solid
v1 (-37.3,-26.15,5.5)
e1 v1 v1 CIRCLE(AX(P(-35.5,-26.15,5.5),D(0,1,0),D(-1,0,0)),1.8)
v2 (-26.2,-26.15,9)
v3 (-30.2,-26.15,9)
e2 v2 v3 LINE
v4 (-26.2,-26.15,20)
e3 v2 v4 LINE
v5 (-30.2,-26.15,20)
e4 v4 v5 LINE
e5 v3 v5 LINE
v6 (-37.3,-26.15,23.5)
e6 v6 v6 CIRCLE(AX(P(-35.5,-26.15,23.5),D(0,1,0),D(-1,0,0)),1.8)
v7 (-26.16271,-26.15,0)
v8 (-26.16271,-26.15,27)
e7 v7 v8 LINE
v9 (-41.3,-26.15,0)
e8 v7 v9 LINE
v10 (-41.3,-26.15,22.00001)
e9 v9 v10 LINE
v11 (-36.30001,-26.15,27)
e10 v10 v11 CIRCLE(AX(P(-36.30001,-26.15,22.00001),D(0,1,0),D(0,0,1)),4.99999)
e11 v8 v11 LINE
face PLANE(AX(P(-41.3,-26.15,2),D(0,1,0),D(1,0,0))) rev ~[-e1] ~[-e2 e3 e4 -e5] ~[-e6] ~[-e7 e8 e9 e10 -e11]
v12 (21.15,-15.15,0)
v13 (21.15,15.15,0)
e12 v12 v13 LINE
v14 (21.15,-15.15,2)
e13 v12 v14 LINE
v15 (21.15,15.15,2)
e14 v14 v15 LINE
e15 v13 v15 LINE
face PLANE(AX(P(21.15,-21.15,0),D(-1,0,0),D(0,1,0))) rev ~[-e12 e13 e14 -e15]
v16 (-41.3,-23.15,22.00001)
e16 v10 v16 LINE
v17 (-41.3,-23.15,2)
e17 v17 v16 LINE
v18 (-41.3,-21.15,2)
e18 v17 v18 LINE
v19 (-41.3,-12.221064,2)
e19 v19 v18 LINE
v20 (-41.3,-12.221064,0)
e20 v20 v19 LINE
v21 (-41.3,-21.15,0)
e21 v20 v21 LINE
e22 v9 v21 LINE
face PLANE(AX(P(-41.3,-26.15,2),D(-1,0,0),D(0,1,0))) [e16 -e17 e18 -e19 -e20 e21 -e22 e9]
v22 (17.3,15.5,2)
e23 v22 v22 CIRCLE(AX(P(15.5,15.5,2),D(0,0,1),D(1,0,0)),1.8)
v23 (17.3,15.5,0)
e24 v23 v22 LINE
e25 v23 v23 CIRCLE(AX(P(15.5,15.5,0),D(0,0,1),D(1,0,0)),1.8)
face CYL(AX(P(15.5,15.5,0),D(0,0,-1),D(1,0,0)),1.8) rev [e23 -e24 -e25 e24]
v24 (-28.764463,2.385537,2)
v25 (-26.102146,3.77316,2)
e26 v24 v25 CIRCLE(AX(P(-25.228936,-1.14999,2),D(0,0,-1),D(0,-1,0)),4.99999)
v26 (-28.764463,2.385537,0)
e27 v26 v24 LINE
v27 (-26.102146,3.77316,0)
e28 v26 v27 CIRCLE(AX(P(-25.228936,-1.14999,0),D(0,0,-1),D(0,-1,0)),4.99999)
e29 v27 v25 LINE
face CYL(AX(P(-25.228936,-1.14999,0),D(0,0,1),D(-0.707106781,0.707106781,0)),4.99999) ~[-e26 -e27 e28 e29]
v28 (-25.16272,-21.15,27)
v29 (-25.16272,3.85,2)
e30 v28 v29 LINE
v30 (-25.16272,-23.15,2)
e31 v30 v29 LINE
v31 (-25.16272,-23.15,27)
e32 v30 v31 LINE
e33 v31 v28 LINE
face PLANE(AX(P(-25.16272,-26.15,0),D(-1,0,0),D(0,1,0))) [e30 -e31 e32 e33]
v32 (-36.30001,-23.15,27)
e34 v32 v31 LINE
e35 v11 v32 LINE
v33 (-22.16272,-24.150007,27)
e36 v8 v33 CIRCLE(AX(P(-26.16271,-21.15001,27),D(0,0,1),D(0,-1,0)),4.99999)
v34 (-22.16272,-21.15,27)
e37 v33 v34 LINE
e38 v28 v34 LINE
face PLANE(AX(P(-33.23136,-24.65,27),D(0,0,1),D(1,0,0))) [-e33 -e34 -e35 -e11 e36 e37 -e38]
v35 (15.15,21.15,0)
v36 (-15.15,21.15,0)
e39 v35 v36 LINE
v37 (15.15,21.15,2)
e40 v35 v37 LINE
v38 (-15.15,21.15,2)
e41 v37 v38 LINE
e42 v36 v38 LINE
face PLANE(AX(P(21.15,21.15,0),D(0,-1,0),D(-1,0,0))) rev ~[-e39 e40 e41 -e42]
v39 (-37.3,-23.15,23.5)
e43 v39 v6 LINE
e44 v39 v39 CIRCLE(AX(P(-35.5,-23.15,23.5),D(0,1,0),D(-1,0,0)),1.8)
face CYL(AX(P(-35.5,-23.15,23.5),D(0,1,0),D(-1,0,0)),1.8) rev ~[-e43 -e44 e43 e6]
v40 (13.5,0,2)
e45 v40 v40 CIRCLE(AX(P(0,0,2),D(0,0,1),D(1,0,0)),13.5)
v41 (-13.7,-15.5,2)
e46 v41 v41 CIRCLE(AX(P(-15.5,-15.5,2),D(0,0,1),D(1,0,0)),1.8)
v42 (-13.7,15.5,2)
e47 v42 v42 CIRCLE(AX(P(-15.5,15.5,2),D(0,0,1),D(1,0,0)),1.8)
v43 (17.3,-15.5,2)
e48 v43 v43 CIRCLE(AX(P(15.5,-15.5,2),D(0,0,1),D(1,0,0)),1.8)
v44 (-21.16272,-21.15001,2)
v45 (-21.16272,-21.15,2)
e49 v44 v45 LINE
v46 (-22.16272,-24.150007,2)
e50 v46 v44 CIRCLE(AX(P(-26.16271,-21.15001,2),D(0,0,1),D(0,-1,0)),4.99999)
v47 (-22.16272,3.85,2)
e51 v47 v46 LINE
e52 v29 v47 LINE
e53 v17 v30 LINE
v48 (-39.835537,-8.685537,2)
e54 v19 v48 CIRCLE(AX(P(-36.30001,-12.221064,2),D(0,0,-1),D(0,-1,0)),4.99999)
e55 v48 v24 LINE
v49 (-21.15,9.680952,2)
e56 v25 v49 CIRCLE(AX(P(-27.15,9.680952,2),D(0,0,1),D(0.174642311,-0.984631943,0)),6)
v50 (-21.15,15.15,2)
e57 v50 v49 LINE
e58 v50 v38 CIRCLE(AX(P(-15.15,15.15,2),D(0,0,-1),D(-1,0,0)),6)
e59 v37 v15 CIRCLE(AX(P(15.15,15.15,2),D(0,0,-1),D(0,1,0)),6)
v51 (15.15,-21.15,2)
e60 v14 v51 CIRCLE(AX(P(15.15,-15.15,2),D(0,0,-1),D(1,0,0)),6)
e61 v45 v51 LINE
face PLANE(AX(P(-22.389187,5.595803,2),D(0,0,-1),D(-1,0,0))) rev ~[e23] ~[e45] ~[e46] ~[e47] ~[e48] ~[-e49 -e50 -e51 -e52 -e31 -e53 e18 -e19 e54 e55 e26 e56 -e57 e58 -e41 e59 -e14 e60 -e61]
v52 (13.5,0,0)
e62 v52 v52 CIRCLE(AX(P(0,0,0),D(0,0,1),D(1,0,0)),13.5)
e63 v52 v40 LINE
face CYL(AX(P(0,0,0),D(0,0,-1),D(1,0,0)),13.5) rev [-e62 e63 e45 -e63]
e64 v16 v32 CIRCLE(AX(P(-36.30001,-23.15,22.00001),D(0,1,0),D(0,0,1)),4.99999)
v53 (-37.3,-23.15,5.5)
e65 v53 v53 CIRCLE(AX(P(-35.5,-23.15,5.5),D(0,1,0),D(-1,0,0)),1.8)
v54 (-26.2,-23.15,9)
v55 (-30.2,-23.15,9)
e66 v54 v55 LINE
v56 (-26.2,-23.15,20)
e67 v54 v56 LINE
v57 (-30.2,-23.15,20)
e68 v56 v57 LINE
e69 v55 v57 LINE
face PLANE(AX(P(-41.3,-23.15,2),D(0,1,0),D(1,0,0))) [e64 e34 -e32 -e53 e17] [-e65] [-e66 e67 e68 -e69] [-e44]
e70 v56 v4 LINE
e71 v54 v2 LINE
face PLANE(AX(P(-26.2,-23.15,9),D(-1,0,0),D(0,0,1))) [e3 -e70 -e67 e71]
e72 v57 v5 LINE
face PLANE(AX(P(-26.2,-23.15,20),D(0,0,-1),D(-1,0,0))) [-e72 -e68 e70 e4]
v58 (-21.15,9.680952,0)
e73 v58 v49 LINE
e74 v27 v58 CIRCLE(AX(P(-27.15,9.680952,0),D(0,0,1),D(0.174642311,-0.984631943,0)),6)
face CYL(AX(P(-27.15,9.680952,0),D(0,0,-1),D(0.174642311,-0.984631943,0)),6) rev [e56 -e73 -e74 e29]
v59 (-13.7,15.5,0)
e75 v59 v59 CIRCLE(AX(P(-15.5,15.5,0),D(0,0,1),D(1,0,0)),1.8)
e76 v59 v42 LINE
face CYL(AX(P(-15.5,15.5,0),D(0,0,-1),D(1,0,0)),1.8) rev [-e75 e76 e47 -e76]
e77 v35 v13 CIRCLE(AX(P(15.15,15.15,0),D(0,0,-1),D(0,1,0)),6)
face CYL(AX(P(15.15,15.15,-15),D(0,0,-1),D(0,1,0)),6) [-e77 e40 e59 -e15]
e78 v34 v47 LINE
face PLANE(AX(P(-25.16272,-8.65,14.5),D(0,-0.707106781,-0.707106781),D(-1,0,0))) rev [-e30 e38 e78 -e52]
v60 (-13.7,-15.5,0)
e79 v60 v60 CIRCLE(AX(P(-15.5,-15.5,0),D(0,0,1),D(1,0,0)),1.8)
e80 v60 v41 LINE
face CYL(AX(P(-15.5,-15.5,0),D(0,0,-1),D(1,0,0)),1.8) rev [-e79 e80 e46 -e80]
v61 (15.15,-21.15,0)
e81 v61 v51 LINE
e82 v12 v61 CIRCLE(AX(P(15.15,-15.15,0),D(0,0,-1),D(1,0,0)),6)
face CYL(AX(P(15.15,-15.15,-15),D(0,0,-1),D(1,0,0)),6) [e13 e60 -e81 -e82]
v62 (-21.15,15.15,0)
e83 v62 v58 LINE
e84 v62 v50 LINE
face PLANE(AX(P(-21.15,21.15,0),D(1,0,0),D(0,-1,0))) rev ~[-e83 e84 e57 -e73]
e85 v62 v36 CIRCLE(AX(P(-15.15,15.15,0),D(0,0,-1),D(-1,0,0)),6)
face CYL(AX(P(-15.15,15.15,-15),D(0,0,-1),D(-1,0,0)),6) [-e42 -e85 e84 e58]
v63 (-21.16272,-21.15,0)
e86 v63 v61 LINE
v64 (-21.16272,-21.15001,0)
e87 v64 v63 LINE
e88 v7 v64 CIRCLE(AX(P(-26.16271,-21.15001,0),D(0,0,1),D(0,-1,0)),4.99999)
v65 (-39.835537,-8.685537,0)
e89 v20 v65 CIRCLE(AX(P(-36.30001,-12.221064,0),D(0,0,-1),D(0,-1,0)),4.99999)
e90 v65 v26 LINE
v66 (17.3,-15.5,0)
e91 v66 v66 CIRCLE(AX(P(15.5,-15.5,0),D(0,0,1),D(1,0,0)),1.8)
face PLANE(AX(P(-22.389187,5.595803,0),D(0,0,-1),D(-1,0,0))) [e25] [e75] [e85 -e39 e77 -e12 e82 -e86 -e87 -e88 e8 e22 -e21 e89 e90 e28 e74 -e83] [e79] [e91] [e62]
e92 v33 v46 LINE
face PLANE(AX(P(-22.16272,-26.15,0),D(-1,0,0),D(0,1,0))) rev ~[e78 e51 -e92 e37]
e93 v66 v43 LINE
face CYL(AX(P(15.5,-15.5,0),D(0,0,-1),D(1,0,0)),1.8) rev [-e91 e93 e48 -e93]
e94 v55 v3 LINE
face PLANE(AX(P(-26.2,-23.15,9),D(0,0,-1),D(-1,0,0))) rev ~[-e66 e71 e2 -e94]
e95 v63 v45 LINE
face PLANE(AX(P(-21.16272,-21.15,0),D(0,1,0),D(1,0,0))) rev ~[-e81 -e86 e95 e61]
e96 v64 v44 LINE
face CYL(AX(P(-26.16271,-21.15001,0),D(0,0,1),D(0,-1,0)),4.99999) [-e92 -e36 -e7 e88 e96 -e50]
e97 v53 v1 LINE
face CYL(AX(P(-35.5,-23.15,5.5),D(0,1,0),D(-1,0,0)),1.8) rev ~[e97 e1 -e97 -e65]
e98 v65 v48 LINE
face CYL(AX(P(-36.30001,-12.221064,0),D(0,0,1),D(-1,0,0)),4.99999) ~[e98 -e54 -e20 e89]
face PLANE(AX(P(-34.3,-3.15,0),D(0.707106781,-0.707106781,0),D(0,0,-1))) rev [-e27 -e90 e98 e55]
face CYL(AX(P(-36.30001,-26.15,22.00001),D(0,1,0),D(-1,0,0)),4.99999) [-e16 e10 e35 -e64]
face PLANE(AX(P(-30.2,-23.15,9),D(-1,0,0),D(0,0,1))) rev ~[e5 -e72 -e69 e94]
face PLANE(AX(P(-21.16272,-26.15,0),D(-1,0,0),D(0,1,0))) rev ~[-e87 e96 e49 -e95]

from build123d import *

# Parameters (mm, degrees)
F0_R         = 1.8
F0_R_2       = 13.5
F0_W         = 20.1372796029
F0_H         = 5
F1_DEPTH     = 2
F2_W         = 3
F2_H         = 30
F3_DEPTH     = 27
F4_W         = 16.1372796029
F4_H         = 3
F5_DEPTH     = 25
F6_R         = 1.8
F6_W         = 4
F6_H         = 11
F7_DEPTH     = 25
F8_SIZE      = 25
F9_SIZE      = 14
F10_R        = 4.99999
F11_T1_DEPTH = 2
F11_T3_DEPTH = 32


# Not quite as in the source:
# - a fillet or chamfer that OpenCascade refuses, or shapes differently, is made with other operations: its cross-section is extruded or revolved along the edge and cut away or added
# - a fillet or chamfer is up to 0.001 mm smaller than in the source, because OpenCascade refuses the exact size
# - a feature names something its author has since deleted; it is built from what else it names


with BuildPart() as f1:
    # F0 (on Top) → F1 (new body)
    with BuildSketch(Plane.XY):
        Polygon((21.15, -21.15), (21.15, 21.15), (-21.15, 21.15), (-21.15, 3.85), (-21.15, -21.15), align=None)
        with Locations((-15.5, -15.5)):
            Circle(F0_R, mode=Mode.SUBTRACT)
        with Locations((15.5, -15.5)):
            Circle(F0_R, mode=Mode.SUBTRACT)
        with Locations((-15.5, 15.5)):
            Circle(F0_R, mode=Mode.SUBTRACT)
        Circle(F0_R_2, mode=Mode.SUBTRACT)
        with Locations((15.5, 15.5)):
            Circle(F0_R, mode=Mode.SUBTRACT)
        Polygon((-21.15, -21.15), (-21.15, 3.85), (-41.3, 3.85), (-41.3, -21.15), (-21.1627203971, -21.15), align=None)
        with Locations((-31.2313601986, -23.65)):
            Rectangle(F0_W, F0_H)
    extrude(amount=F1_DEPTH)

    # F2 (on Top) → F3 (join)
    with BuildSketch(Plane.XY):
        with Locations((-23.6627203971, -11.15)):
            Rectangle(F2_W, F2_H)
    extrude(amount=F3_DEPTH)

    # F4 (on face) → F5 (join)
    with BuildSketch(Plane.XY.offset(2)):
        with Locations((-33.2313601986, -24.65)):
            Rectangle(F4_W, F4_H)
    extrude(amount=F5_DEPTH)

    # F6 (on face) → F7 (cut)
    with BuildSketch(Plane(origin=(0, -23.15, 0), x_dir=(-1, 0, 0), z_dir=(0, 1, 0))):
        with Locations((35.5, 5.5)):
            Circle(F6_R)
        with Locations((35.5, 23.5)):
            Circle(F6_R)
        with Locations((28.2, 14.5)):
            Rectangle(F6_W, F6_H)
    extrude(amount=-F7_DEPTH, mode=Mode.SUBTRACT)

    # F8
    f8_edges = [f1.edges().sort_by_distance(p)[0] for p in [
        (-23.66272, 3.85, 27),
    ]]
    chamfer(f8_edges, length=F8_SIZE)

    # F9
    f9_edges = [f1.edges().sort_by_distance(p)[0] for p in [
        (-41.3, 3.85, 1),
    ]]
    chamfer(f9_edges, length=F9_SIZE)

    # F10 (radius 5 in the source; OpenCascade refuses exactly that, so slightly less here)
    f10_edges = [f1.edges().sort_by_distance(p)[0] for p in [
        (-41.3, -10.15, 1),
        (-27.3, 3.85, 1),
        (-21.16272, -26.15, 1),
        (-41.3, -24.65, 27),
    ]]
    fillet(f10_edges, radius=F10_R)

    # F11: fillet of radius 6 on 4 edges, made by hand

    # F11_s2 → F11_t1 (join)
    with BuildSketch(Plane.XY):
        with BuildLine():
            ThreePointArc((-26.1021461366, 3.7731598692), (-22.5517871308, 5.8265464621), (-21.15, 9.6809515277))
            Line((-21.15, 9.6809515277), (-20.55, 9.6809515277))
            Line((-20.55, 9.6809515277), (-20.55, 3.85))
            Line((-20.55, 3.85), (-21.15, 3.25))
            ThreePointArc((-21.15, 3.25), (-25.2289363303, 3.25), (-25.9973607503, 3.1823807033))
            Line((-25.9973607503, 3.1823807033), (-26.1021461366, 3.7731598692))
        make_face()
    extrude(amount=F11_T1_DEPTH)

    # F11_s4 → F11_t3 (cut)
    with BuildSketch(Plane.XY.offset(-15)):
        with BuildLine():
            ThreePointArc((21.15, -15.15), (19.3926406871, -19.3926406871), (15.15, -21.15))
            Line((15.15, -21.15), (21.15, -21.15))
            Line((21.15, -21.15), (21.15, -15.15))
        make_face()
        with BuildLine():
            ThreePointArc((15.15, 21.15), (19.3926406871, 19.3926406871), (21.15, 15.15))
            Line((21.15, 15.15), (21.15, 21.15))
            Line((21.15, 21.15), (15.15, 21.15))
        make_face()
        with BuildLine():
            ThreePointArc((-21.15, 15.15), (-19.3926406871, 19.3926406871), (-15.15, 21.15))
            Line((-15.15, 21.15), (-21.15, 21.15))
            Line((-21.15, 21.15), (-21.15, 15.15))
        make_face()
    extrude(amount=F11_T3_DEPTH, mode=Mode.SUBTRACT)


solid = f1.part
